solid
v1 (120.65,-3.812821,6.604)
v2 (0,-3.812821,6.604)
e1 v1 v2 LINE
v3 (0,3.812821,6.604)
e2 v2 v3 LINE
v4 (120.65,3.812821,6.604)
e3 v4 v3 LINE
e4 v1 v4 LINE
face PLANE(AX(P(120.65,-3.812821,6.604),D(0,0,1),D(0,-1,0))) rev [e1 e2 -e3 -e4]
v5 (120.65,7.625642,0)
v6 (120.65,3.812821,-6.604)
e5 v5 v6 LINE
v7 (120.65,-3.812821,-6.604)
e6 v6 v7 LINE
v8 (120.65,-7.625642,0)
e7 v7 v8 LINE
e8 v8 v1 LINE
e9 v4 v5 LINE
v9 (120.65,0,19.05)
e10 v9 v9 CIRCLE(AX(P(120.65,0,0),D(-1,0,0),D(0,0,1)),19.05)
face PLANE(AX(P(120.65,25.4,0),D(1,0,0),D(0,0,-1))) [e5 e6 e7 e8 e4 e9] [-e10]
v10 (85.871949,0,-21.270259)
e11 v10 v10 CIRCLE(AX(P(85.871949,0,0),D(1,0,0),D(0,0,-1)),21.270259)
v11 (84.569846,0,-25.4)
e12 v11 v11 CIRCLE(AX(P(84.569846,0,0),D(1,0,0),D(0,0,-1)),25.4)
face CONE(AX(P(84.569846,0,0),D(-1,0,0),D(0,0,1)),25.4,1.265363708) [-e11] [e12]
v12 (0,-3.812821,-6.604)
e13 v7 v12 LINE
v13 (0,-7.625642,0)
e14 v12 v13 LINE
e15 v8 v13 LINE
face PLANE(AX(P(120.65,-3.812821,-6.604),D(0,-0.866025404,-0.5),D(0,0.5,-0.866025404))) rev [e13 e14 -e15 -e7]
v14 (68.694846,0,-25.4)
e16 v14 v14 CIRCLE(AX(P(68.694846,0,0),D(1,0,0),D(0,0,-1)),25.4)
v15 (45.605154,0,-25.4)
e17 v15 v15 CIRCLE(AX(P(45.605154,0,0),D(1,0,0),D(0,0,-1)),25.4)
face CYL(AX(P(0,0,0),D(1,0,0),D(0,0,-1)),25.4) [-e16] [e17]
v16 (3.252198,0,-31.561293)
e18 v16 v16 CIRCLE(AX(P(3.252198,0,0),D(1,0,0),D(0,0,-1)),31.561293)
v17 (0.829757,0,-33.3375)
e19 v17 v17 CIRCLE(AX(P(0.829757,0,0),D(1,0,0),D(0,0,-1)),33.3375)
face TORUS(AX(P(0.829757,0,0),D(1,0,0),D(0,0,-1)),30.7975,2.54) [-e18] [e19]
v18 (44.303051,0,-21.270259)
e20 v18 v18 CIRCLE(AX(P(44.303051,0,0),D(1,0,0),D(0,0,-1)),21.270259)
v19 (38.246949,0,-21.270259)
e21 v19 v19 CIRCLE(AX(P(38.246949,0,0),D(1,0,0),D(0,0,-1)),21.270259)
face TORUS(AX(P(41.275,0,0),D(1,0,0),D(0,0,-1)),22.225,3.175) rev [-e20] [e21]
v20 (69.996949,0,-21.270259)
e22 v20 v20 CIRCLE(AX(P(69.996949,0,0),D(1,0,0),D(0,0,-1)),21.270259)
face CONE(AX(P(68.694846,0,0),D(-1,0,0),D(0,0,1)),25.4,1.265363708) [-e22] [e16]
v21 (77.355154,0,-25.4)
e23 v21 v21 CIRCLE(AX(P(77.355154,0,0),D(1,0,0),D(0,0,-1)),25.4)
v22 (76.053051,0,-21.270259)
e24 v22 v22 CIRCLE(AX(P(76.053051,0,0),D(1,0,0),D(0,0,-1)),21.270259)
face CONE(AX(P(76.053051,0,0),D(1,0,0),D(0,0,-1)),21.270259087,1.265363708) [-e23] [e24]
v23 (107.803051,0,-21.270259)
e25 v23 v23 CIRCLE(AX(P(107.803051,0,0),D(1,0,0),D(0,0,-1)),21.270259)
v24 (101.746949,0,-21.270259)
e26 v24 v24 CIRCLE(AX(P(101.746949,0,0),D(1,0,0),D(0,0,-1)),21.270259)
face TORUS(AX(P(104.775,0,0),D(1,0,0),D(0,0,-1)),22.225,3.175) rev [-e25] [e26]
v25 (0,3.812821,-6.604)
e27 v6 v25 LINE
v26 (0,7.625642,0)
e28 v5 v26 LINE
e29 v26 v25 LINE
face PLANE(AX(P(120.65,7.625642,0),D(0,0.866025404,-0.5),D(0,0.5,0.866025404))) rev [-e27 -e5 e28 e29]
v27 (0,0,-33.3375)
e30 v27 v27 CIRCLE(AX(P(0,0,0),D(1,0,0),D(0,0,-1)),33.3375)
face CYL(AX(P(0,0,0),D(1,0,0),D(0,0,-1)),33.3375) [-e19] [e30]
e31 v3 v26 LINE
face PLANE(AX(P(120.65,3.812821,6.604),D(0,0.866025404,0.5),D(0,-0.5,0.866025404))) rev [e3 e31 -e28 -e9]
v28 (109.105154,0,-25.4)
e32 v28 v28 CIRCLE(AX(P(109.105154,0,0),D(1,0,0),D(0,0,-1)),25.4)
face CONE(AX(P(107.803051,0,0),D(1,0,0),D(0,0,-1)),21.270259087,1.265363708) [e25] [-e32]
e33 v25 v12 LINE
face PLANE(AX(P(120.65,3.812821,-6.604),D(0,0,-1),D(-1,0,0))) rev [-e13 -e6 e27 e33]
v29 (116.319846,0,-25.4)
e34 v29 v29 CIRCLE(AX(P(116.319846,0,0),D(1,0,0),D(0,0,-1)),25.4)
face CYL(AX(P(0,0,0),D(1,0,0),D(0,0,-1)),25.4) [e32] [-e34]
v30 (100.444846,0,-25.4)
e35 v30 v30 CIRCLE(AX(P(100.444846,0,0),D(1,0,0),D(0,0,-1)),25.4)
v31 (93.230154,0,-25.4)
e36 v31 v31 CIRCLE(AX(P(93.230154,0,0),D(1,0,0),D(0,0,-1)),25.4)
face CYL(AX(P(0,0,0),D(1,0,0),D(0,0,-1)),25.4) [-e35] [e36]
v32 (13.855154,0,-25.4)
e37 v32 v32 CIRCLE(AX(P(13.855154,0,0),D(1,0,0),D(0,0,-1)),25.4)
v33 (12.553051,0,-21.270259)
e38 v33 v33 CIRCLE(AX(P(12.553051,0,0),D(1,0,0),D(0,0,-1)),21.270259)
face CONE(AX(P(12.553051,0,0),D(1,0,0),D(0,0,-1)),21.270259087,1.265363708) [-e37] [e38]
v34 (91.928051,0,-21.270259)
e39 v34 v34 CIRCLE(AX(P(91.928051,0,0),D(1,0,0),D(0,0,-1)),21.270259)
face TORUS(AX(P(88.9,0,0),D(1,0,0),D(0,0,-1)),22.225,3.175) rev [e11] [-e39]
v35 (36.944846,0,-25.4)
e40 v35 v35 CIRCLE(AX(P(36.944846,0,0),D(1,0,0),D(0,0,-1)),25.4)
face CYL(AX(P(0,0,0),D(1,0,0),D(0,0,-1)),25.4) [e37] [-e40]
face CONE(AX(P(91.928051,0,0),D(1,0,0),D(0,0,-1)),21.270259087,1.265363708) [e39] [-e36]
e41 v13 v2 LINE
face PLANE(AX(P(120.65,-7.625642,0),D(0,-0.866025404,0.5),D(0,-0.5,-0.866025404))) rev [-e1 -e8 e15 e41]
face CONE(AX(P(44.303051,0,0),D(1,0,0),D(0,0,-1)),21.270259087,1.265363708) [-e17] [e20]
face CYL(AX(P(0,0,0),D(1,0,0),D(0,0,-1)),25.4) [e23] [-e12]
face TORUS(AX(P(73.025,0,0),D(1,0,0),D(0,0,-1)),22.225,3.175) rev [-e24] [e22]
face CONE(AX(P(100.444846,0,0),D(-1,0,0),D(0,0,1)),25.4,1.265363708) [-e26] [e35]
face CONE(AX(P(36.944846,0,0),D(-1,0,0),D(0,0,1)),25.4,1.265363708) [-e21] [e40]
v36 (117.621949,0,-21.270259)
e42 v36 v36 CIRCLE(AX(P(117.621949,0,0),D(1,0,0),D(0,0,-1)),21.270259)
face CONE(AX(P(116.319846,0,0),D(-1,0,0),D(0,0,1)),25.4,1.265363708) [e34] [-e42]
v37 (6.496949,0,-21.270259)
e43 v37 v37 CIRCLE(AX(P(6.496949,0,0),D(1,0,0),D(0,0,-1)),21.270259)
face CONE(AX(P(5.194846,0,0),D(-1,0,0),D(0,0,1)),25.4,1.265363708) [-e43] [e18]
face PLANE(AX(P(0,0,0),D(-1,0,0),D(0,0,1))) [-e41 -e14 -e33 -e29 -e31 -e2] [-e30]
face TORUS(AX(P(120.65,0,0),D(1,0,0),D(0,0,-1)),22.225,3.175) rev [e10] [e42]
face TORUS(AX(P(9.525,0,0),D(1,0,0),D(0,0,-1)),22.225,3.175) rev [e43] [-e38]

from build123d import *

# Parameters (mm, degrees)
SKETCH1_W          = 120.65
SKETCH1_H          = 25.4
CUT_EXTRUDE1_DEPTH = 126.88384527


# Read off the part's stored shape, not the designer's step: Revolve2
with BuildPart() as part:
    # Sketch1 → Revolve1 (revolve)
    with BuildSketch(Plane.XY, mode=Mode.PRIVATE) as revolve1_sk:
        with Locations((60.325, 12.7)):
            Rectangle(SKETCH1_W, SKETCH1_H)
    revolve(revolve1_sk.sketch.rotate(Axis((0, 0, 0), (-1, 0, 0)), 90), axis=Axis((0, 0, 0), (-1, 0, 0)))

    # Sketch2 → Cut-Revolve1 (revolve, cut)
    with BuildSketch(Plane.XY, mode=Mode.PRIVATE) as cut_revolve1_sk:
        with BuildLine():
            Line((5.194846373, 25.4), (6.496948681, 21.270259087))
            ThreePointArc((6.496948681, 21.270259087), (9.525, 19.05), (12.553051319, 21.270259087))
            Line((12.553051319, 21.270259087), (13.855153627, 25.4))
            Line((13.855153627, 25.4), (5.194846373, 25.4))
        make_face()
        with BuildLine():
            Line((36.944846373, 25.4), (38.246948681, 21.270259087))
            ThreePointArc((38.246948681, 21.270259087), (41.275, 19.05), (44.303051319, 21.270259087))
            Line((44.303051319, 21.270259087), (45.605153627, 25.4))
            Line((45.605153627, 25.4), (36.944846373, 25.4))
        make_face()
        with BuildLine():
            Line((68.694846373, 25.4), (69.996948681, 21.270259087))
            ThreePointArc((69.996948681, 21.270259087), (73.025, 19.05), (76.053051319, 21.270259087))
            Line((76.053051319, 21.270259087), (77.355153627, 25.4))
            Line((77.355153627, 25.4), (68.694846373, 25.4))
        make_face()
        with BuildLine():
            Line((100.444846373, 25.4), (101.746948681, 21.270259087))
            ThreePointArc((101.746948681, 21.270259087), (104.775, 19.05), (107.803051319, 21.270259087))
            Line((107.803051319, 21.270259087), (109.105153627, 25.4))
            Line((109.105153627, 25.4), (100.444846373, 25.4))
        make_face()
    revolve(cut_revolve1_sk.sketch.rotate(Axis((0, 0, 0), (-1, 0, 0)), 90), axis=Axis((0, 0, 0), (-1, 0, 0)), mode=Mode.SUBTRACT)

    # Sketch3 → Cut-Extrude1 (cut, through all)
    with BuildSketch(Plane.ZY):
        Polygon((0, 7.625642355), (-6.604, 3.812821178), (-6.604, -3.812821178), (0, -7.625642355), (6.604, -3.812821178), (6.604, 3.812821178), align=None)
    extrude(amount=-CUT_EXTRUDE1_DEPTH, mode=Mode.SUBTRACT)

    # Sketch4 → Cut-Revolve2 (revolve, cut)
    with BuildSketch(Plane.XY, mode=Mode.PRIVATE) as cut_revolve2_sk:
        with BuildLine():
            Line((116.319846373, 25.4), (117.621948681, 21.270259087))
            ThreePointArc((117.621948681, 21.270259087), (120.65, 19.05), (123.678051319, 21.270259087))
            Line((123.678051319, 21.270259087), (124.980153627, 25.4))
            Line((124.980153627, 25.4), (116.319846373, 25.4))
        make_face()
        with BuildLine():
            Line((84.569846373, 25.4), (85.871948681, 21.270259087))
            ThreePointArc((85.871948681, 21.270259087), (88.9, 19.05), (91.928051319, 21.270259087))
            Line((91.928051319, 21.270259087), (93.230153627, 25.4))
            Line((93.230153627, 25.4), (84.569846373, 25.4))
        make_face()
    revolve(cut_revolve2_sk.sketch.rotate(Axis((0, 0, 0), (-1, 0, 0)), 90), axis=Axis((0, 0, 0), (-1, 0, 0)), mode=Mode.SUBTRACT)

    # Revolve2 outline → Revolve2 (revolve)
    with BuildSketch(Plane.YX):
        with BuildLine():
            Line((25.4, 5.194846373), (25.4, 0))
            Line((25.4, 0), (33.3375, 0))
            Line((33.3375, 0), (33.3375, 0.829757182))
            ThreePointArc((33.3375, 0.829757182), (32.845869295, 2.331683689), (31.561292731, 3.252198237))
            Line((31.561292731, 3.252198237), (25.4, 5.194846373))
        make_face()
    revolve(axis=Axis((0, 0, 0), (1, 0, 0)))


solid = part.part
